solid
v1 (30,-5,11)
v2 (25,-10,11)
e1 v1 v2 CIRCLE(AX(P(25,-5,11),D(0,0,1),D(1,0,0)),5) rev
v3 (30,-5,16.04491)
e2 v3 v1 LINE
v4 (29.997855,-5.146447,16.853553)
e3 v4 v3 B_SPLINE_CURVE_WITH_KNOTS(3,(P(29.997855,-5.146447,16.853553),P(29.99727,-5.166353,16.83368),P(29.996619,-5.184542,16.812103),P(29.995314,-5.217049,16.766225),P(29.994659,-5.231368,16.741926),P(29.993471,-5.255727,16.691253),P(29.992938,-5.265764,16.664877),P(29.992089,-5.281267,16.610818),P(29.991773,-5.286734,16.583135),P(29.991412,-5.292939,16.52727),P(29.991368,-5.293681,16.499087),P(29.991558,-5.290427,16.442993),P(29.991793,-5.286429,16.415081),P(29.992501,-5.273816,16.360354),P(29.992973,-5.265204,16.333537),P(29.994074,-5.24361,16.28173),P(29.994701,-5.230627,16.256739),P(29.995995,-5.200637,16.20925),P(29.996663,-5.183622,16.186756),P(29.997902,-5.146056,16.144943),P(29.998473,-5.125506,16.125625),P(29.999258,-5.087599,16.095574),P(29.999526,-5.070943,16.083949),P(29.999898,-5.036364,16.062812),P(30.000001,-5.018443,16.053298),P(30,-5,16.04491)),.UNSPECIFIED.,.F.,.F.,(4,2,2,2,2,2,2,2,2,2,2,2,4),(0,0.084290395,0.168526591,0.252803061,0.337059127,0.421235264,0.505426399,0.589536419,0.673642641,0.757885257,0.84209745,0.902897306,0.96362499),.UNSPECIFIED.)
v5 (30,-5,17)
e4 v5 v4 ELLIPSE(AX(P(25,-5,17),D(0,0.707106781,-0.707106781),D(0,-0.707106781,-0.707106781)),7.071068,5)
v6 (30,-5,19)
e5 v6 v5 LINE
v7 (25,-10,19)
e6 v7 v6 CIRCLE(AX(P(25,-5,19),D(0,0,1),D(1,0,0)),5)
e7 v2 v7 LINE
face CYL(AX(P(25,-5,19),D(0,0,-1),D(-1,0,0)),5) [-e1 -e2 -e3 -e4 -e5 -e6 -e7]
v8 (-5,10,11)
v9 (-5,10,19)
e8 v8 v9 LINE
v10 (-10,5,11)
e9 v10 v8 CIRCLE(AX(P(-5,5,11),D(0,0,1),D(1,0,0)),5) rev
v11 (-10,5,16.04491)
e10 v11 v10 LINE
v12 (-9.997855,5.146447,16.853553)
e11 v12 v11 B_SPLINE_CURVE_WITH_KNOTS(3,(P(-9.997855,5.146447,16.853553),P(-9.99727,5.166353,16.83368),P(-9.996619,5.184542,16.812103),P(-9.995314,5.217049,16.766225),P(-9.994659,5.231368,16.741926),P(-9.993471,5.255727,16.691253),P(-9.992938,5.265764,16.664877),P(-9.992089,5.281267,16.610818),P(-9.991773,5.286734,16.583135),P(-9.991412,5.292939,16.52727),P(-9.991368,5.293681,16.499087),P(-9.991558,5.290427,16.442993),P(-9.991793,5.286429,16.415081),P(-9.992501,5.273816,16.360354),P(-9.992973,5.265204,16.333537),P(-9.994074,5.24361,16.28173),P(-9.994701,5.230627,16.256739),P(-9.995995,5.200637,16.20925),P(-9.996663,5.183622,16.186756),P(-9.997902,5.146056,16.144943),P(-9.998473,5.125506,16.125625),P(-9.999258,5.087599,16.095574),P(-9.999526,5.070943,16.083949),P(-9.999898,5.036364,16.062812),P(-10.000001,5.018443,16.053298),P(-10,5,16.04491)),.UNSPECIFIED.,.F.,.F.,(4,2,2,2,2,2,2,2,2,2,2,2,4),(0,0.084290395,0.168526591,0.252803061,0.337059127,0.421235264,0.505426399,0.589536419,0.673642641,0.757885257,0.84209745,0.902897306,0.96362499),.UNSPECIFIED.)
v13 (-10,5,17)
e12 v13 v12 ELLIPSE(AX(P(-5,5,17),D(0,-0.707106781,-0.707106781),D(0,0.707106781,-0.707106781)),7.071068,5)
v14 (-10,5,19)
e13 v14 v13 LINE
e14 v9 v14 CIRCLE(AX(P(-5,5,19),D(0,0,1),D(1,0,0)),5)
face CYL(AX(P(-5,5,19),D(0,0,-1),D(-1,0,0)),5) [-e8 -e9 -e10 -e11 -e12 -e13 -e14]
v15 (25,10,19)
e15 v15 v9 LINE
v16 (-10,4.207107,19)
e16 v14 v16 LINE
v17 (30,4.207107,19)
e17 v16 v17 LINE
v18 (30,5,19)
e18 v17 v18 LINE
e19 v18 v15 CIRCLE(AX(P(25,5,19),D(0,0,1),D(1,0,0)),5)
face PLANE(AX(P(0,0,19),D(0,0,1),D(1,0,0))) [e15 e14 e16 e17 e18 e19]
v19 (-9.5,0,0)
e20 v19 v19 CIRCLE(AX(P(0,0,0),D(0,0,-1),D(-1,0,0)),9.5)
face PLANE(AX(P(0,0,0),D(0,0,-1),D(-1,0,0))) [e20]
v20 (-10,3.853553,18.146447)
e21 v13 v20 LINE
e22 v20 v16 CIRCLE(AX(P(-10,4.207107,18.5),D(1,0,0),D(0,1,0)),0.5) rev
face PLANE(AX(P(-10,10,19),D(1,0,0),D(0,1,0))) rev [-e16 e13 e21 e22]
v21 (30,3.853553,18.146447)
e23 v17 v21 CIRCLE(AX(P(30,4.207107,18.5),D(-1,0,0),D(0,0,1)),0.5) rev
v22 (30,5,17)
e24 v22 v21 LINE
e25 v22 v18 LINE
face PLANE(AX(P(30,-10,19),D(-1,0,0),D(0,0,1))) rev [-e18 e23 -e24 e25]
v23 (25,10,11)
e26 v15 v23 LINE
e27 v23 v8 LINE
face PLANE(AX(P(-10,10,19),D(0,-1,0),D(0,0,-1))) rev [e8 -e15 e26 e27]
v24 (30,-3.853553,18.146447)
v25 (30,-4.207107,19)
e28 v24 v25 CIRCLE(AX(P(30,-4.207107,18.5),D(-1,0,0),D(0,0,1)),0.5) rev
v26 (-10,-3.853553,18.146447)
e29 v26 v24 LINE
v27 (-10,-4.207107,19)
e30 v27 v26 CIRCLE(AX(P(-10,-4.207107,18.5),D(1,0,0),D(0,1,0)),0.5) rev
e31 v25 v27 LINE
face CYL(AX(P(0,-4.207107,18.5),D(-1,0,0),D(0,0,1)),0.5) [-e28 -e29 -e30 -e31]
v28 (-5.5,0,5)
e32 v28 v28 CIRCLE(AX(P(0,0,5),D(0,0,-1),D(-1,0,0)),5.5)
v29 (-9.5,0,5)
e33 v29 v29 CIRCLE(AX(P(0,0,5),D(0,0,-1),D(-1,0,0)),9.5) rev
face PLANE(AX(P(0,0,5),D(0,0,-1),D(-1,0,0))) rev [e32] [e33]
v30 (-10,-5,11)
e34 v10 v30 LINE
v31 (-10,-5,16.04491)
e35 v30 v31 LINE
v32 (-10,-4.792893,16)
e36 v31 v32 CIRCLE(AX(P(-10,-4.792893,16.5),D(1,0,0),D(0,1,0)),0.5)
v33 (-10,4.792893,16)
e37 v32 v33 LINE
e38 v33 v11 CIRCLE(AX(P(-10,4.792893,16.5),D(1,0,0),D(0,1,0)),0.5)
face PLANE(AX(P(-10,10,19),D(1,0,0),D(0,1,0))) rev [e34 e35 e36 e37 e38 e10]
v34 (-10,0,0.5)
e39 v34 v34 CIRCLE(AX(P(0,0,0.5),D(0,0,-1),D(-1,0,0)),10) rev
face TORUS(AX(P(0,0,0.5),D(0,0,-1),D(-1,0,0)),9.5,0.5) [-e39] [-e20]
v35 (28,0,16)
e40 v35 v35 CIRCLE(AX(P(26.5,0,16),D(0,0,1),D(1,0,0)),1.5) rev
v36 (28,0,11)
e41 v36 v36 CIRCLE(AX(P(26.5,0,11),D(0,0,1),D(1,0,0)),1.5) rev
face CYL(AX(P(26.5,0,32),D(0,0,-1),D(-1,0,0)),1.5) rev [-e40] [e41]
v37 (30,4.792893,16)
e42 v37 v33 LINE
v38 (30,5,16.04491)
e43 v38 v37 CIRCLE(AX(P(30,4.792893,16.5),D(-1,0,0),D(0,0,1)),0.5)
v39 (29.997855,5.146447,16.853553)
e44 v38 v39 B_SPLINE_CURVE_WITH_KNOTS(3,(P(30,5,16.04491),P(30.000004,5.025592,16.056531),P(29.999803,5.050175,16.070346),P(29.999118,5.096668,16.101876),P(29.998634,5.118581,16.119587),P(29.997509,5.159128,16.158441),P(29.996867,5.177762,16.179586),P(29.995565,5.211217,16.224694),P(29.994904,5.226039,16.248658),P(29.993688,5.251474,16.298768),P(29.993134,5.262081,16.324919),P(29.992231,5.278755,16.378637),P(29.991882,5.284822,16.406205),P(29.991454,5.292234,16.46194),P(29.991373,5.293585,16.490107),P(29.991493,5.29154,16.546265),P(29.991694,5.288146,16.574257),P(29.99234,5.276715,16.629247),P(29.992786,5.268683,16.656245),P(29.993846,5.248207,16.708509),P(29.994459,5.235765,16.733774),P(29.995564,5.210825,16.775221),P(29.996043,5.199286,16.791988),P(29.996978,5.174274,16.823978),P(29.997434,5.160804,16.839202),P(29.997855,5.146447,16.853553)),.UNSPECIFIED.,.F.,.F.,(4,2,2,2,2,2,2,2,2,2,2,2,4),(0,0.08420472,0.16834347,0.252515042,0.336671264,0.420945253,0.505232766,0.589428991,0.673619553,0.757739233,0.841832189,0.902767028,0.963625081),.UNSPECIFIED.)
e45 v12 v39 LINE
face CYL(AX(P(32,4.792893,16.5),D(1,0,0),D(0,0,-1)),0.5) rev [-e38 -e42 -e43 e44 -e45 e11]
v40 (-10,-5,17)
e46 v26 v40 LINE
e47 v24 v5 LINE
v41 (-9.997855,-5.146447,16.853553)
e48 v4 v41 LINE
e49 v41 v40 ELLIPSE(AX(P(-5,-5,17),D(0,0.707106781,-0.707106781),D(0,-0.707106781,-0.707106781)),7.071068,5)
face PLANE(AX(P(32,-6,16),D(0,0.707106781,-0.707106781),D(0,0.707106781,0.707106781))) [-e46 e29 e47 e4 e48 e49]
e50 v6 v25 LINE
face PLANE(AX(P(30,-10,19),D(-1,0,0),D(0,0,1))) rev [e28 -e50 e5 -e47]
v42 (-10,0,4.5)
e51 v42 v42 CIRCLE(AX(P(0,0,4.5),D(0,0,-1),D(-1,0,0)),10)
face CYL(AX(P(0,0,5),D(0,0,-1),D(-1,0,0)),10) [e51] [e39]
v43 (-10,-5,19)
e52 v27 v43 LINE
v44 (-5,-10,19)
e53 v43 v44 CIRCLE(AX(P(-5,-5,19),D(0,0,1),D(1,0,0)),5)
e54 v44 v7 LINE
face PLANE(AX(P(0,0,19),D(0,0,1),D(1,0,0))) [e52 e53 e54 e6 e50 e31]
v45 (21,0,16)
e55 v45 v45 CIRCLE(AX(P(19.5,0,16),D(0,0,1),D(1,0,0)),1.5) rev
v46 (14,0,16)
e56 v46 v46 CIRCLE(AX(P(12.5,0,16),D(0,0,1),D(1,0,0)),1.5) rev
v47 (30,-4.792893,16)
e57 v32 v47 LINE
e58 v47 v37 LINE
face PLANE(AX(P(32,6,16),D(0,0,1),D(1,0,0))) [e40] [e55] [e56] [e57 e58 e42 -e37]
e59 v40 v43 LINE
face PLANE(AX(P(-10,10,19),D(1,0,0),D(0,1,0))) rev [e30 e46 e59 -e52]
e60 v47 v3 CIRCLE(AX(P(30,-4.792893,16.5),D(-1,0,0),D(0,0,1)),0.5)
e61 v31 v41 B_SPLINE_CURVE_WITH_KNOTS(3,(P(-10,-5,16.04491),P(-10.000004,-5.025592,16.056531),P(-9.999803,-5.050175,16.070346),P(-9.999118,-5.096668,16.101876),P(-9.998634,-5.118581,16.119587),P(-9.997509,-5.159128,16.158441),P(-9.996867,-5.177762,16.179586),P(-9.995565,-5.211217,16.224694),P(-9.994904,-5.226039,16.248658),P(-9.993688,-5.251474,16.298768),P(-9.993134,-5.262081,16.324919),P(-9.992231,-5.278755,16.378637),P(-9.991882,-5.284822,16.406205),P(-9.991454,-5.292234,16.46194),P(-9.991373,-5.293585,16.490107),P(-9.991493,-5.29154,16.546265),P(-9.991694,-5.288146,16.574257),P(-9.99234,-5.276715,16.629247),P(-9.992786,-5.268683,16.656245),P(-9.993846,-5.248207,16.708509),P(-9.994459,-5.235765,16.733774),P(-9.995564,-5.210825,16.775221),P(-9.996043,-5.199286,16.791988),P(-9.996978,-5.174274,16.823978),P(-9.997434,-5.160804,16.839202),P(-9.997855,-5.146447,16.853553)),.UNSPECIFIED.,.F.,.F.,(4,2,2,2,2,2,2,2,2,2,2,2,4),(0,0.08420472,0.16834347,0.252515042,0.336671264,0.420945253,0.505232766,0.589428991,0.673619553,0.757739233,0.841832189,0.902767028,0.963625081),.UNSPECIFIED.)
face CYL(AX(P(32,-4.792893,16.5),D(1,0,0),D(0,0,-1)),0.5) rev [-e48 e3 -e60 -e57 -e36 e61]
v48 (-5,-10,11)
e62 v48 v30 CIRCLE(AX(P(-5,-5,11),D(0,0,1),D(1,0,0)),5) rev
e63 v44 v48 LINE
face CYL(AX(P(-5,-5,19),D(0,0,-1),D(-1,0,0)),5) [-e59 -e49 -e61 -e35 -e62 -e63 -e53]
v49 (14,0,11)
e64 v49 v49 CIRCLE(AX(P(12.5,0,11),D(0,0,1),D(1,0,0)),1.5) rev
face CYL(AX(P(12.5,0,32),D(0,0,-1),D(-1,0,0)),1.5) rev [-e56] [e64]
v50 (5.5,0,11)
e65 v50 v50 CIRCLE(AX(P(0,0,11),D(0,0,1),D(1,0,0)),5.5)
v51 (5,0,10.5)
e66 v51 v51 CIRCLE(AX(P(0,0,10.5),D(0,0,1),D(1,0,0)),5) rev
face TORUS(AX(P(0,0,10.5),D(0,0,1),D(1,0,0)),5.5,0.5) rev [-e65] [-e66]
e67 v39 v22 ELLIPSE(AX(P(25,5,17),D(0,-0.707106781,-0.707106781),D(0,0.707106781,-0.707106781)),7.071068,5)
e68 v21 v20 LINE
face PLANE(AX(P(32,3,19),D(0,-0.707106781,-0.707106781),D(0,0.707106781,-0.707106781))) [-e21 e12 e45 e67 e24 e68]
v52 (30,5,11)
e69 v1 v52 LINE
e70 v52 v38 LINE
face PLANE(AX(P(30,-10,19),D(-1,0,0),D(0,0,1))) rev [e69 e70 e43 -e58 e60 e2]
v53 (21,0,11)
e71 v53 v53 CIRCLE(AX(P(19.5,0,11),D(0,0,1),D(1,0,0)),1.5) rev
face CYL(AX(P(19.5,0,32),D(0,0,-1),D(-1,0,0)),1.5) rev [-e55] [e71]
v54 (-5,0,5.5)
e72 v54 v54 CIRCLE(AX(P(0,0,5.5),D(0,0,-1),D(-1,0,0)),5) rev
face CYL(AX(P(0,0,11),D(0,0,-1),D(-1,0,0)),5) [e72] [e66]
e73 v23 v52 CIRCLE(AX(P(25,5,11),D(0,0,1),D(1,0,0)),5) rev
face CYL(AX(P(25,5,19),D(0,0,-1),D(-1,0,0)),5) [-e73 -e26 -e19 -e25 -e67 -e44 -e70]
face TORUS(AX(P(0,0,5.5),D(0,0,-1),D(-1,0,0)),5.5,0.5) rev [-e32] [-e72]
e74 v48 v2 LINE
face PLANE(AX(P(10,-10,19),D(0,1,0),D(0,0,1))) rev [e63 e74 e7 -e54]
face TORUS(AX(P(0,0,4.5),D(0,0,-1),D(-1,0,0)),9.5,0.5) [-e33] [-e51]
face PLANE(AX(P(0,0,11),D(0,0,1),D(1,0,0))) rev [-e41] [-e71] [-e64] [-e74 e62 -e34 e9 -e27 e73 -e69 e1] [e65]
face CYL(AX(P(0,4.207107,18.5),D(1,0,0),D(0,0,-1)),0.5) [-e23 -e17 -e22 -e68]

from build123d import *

# Parameters (mm, degrees)
BOSS_EXTRUDE1_DEPTH = 5
SKETCH2_R           = 5
BOSS_EXTRUDE2_DEPTH = 11
BOSS_EXTRUDE3_DEPTH = 8
CUT_EXTRUDE1_DEPTH  = 42
SKETCH6_R           = 1.5
CUT_EXTRUDE2_DEPTH  = 32
LPATTERN1_COUNT     = 3
LPATTERN1_PITCH     = 7
FILLET1_R           = 0.5
FILLET2_R           = 5
FILLET3_R           = 0.5


with BuildPart() as part:
    # Sketch1 → Boss-Extrude1 (new body)
    with BuildSketch(Plane.XY):
        with BuildLine():
            ThreePointArc((10, 0), (0, 10), (-10, 0))
            ThreePointArc((-10, 0), (0, -10), (10, 0))
        make_face()
    extrude(amount=BOSS_EXTRUDE1_DEPTH)

    # Sketch2 → Boss-Extrude2 (add)
    with BuildSketch(Plane.XY):
        with Locations(Location((0, 0, 0), (0, 0, 180))):
            Circle(SKETCH2_R)
    extrude(amount=BOSS_EXTRUDE2_DEPTH)

    # Sketch3 → Boss-Extrude3 (add)
    with BuildSketch(Plane.XY.offset(11)):
        Polygon((10, -10), (30, -10), (30, 10), (10, 10), (-10, 10), (-10, -10), align=None)
    extrude(amount=BOSS_EXTRUDE3_DEPTH)

    # Sketch5 → Cut-Extrude1 (cut)
    with BuildSketch(Plane(origin=(-10, 0, 0), x_dir=(0, 0, -1), z_dir=(1, 0, 0))):
        Polygon((-19, 3), (-16, 6), (-16, -6), (-19, -3), align=None)
    extrude(amount=CUT_EXTRUDE1_DEPTH, mode=Mode.SUBTRACT)

    # Sketch6 → Cut-Extrude2 (cut)
    with BuildSketch(Plane.XY):
        with Locations((26.5, 0)):
            Circle(SKETCH6_R)
    cut_extrude2 = extrude(amount=CUT_EXTRUDE2_DEPTH, mode=Mode.SUBTRACT)

    # LPattern1: Cut-Extrude2 ×3
    with Locations(*[(-i * LPATTERN1_PITCH, 0, 0) for i in range(1, LPATTERN1_COUNT)]):
        add(cut_extrude2, mode=Mode.SUBTRACT)

    # Fillet1
    fillet1_edges = [part.edges().sort_by_distance(p)[0] for p in [
        (10, 3, 19),
        (10, -3, 19),
        (10, -6, 16),
        (10, 6, 16),
    ]]
    fillet(fillet1_edges, radius=FILLET1_R)

    # Fillet2
    # the kernel refuses this fillet: 5 mm, written as the material it takes off along each edge
    with BuildSketch(Plane(origin=(-10, -10, -1.5), x_dir=(1, 0, 0), z_dir=(0, 0, 1)), Plane(origin=(30, -10, -1.5), x_dir=(0, 1, 0), z_dir=(0, 0, 1))) as fillet2_piece_1:
        with BuildLine():
            CenterArc((FILLET2_R, FILLET2_R), FILLET2_R, 180, 90)
            Line((0, FILLET2_R), (0, 0))
            Line((0, 0), (FILLET2_R, 0))
        make_face()
    extrude(amount=33, mode=Mode.SUBTRACT)
    with BuildSketch(Plane(origin=(30, 10, -1.5), x_dir=(0, -1, 0), z_dir=(0, 0, 1)), Plane(origin=(-10, 10, -1.5), x_dir=(1, 0, 0), z_dir=(0, 0, 1))) as fillet2_piece_2:
        with BuildLine():
            CenterArc((FILLET2_R, -FILLET2_R), FILLET2_R, 90, 90)
            Line((0, -FILLET2_R), (0, 0))
            Line((0, 0), (FILLET2_R, 0))
        make_face()
    extrude(amount=33, mode=Mode.SUBTRACT)

    # Fillet3
    fillet3_edges = [part.edges().sort_by_distance(p)[0] for p in [
        (5, 0, 11),
        (10, 0, 0),
        (10, 0, 5),
        (5, 0, 5),
    ]]
    fillet(fillet3_edges, radius=FILLET3_R)


solid = part.part
